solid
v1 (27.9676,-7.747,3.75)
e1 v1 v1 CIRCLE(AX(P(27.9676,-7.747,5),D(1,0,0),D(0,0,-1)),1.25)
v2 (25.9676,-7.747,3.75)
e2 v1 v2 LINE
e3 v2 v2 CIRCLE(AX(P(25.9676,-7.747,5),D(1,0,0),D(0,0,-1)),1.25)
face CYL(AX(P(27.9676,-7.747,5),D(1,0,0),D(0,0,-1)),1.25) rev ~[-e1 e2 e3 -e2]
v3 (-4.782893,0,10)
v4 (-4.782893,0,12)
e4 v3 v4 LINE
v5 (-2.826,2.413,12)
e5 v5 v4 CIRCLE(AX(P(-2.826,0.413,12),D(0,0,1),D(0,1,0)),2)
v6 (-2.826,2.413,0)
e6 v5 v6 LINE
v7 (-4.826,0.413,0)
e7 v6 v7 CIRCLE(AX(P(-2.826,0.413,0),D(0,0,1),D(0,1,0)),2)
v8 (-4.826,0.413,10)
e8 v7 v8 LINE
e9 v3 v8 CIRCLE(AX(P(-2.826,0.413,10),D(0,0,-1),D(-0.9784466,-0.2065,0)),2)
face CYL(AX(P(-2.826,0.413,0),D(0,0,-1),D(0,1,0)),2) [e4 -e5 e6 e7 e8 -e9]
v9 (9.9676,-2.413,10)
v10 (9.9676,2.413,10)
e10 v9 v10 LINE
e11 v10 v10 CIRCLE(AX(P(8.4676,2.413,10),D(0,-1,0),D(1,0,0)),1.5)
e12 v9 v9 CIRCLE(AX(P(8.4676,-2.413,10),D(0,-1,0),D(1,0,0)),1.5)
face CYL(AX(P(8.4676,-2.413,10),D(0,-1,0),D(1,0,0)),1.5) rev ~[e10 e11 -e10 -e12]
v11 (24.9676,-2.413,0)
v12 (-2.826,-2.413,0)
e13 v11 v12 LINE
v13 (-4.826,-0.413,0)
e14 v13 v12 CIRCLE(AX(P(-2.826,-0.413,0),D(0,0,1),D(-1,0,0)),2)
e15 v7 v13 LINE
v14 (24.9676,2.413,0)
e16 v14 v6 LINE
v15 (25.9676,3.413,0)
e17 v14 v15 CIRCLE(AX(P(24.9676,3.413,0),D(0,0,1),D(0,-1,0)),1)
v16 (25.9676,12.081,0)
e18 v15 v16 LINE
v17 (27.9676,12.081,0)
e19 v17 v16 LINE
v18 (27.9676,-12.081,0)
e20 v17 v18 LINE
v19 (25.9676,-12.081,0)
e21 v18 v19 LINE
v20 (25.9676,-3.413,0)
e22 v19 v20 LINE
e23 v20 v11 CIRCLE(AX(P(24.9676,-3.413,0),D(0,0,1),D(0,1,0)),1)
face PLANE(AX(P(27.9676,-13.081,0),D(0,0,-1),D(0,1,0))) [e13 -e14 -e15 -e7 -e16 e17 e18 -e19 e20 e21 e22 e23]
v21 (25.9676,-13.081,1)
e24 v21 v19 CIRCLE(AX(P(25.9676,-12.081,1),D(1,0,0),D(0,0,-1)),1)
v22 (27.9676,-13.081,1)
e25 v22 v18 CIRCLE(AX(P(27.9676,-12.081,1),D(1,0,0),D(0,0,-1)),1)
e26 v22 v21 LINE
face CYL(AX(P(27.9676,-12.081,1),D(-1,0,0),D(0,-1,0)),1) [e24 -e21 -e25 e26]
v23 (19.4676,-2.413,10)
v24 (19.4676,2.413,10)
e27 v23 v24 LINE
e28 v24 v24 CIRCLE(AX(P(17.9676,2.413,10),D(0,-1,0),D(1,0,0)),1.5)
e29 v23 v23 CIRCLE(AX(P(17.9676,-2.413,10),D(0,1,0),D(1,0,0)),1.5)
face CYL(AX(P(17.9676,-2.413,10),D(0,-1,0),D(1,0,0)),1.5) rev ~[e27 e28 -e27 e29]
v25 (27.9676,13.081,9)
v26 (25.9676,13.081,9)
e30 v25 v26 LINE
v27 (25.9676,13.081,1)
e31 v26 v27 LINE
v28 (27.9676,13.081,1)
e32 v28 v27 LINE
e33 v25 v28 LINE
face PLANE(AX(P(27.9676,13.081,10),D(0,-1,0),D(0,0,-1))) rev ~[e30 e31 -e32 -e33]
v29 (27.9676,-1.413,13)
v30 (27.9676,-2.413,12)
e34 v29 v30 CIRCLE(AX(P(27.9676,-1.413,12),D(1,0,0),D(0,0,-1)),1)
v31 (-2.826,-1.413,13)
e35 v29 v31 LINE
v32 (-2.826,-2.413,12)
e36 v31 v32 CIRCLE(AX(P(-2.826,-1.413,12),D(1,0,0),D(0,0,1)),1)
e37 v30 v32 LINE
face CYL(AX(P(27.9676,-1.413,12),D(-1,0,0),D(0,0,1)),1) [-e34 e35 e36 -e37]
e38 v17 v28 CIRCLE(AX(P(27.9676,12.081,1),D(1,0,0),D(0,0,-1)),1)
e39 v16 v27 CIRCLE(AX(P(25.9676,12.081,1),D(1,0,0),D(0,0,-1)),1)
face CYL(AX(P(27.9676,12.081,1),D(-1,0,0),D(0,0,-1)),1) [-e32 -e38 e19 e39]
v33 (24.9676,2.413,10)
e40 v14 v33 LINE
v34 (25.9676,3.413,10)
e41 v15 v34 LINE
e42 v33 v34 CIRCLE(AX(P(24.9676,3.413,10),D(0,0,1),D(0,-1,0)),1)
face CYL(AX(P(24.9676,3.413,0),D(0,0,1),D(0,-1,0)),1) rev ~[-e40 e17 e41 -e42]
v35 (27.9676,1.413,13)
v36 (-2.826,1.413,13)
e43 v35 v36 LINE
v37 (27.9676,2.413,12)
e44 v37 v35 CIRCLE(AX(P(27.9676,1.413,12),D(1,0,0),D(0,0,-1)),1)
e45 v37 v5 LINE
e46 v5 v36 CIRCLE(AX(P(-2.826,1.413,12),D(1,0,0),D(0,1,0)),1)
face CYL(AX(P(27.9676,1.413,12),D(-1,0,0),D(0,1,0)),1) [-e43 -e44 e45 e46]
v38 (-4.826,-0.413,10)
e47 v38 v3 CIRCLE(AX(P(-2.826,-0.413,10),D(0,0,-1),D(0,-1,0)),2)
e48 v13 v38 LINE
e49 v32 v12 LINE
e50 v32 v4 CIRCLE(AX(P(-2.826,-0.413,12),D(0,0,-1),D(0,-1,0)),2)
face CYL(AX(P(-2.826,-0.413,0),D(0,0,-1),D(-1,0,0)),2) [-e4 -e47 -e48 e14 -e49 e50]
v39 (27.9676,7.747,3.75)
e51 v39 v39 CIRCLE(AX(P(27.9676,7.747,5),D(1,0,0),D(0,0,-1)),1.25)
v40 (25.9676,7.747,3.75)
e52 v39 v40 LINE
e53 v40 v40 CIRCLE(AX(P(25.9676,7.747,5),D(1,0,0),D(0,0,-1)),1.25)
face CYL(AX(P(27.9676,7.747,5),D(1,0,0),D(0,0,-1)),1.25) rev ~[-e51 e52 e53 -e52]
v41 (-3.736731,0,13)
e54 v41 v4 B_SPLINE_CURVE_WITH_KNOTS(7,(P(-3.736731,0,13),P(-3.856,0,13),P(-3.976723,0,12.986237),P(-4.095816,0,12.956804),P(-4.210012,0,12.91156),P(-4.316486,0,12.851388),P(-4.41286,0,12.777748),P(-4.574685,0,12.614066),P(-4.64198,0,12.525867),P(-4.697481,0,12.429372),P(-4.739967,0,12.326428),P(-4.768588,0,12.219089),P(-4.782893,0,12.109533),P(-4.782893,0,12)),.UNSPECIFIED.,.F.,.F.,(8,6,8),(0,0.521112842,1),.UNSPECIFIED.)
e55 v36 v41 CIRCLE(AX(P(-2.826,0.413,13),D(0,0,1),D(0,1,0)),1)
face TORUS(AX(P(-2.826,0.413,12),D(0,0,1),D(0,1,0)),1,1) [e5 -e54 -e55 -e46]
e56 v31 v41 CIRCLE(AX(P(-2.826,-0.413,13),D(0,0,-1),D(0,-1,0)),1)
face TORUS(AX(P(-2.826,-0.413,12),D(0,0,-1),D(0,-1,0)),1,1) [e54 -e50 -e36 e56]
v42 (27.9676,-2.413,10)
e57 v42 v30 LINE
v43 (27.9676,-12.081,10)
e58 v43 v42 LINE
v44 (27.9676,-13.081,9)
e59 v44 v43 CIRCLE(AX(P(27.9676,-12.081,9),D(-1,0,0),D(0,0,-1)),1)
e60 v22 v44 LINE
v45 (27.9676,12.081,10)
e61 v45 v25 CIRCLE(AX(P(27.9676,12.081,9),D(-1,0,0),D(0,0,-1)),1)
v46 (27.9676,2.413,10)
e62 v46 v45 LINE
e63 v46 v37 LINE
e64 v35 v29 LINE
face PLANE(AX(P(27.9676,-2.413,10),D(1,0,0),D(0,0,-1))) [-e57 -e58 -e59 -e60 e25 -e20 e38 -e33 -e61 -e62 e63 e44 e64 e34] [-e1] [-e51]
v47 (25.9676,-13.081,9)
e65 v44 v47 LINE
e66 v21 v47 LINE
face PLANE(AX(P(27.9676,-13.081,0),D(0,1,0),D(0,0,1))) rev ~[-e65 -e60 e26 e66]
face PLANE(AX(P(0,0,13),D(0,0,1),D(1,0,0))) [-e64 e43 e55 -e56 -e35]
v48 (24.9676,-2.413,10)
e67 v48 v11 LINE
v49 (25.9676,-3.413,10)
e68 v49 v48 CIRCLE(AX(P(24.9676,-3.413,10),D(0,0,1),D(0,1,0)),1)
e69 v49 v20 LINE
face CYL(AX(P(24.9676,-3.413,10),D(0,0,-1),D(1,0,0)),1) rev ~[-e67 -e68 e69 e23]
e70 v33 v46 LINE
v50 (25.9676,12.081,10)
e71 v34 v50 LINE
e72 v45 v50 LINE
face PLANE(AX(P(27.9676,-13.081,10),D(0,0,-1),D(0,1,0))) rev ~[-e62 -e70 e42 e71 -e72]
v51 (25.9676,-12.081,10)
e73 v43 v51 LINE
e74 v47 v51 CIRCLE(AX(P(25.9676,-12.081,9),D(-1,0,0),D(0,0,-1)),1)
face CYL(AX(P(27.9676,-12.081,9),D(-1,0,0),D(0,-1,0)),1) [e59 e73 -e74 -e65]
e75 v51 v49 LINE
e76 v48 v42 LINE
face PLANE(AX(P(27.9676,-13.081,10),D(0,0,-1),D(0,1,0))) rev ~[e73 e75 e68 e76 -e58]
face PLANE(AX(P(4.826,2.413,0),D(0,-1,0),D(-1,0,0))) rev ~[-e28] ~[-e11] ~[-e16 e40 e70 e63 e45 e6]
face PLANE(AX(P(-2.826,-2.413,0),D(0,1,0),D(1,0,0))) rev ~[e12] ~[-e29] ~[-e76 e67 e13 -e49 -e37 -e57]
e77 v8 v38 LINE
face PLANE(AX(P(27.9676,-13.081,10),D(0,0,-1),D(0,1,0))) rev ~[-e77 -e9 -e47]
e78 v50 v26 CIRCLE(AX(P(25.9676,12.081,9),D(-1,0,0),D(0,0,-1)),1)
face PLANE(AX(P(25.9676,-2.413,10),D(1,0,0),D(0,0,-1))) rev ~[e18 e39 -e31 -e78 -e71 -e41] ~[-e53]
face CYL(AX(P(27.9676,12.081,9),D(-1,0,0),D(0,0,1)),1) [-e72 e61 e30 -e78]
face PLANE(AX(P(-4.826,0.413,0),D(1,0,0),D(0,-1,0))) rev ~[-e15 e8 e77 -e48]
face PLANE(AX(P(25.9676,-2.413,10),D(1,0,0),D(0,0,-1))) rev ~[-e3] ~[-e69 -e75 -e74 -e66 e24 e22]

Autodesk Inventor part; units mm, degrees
ref_plane "YZ Plane" through (0, 0, 0) normal (1, 0, 0) x (0, 1, 0)
ref_plane "XZ Plane" through (0, 0, 0) normal (0, 1, 0) x (-1, 0, 0)
sketch "Sketch1" plane through (0, 0, 0) normal (0, 0, 1) x (1, 0, 0)
  line L0 (-4.826, 0.413) -> (-4.826, -0.413) projected
  line L1 (-2.826, -2.413) -> (4.826, -2.413) projected
  line L2 (4.826, -2.413) -> (4.826, 2.413) projected
  line L3 (4.826, 2.413) -> (-2.826, 2.413) projected
  arc A0 (-4.826, -0.413) -> (-2.826, -2.413) centre (-2.826, -0.413) ccw projected
  arc A1 (-2.826, 2.413) -> (-4.826, 0.413) centre (-2.826, 0.413) ccw projected
  point P0 (0, 0)
extrude "Extrusion1" add sketch "Sketch1" along normal blind 10
sketch "Sketch2" plane through (4.826, -2.413, 0) normal (1, 0, 0) x (0, 0, -1)
  line L0 (0, 0) -> (-10, 0) projected
  line L1 (-10, 0) -> (-10, 4.826) projected
  circle A0 centre (3.175, 150.3292) radius 1.5 projected
  circle A1 centre (3.175, 23.749) radius 1.5 projected
  circle A2 centre (73.025, 23.749) radius 1.5 projected
  circle A3 centre (73.025, 150.3292) radius 1.5 projected
  arc A4 (60.2046, 236.2874) -> (0.9041, 211.5001) centre (77.9391, 110.5317) ccw projected
  ellipse E0 centre (170.686, 87.0391) end of major axis (408.43, 87.0391) minor radius 177.8 (0.9041, 211.5001) -> (0.9041, -37.4219) ccw projected
  arc A5 (0.9041, -37.4219) -> (60.2046, -62.2092) centre (77.9391, 63.5465) ccw projected
  arc A6 (60.2046, -62.2092) -> (281.1673, -62.2092) centre (170.686, 721.2179) ccw projected
  arc A7 (281.1673, -62.2092) -> (340.4678, -37.4219) centre (263.4329, 63.5465) ccw projected
  ellipse E1 centre (170.686, 87.0391) end of major axis (408.43, 87.0391) minor radius 177.8 (340.4678, -37.4219) -> (340.4678, 211.5001) ccw projected
  arc A8 (340.4678, 211.5001) -> (281.1673, 236.2874) centre (263.4329, 110.5317) ccw projected
  arc A9 (281.1673, 236.2874) -> (60.2046, 236.2874) centre (170.686, -547.1397) ccw projected
  circle A10 centre (18.1159, 118.5546) radius 1.25 projected
  circle A11 centre (-51.7341, 53.7756) radius 1.25 projected
  circle A12 centre (18.1159, 53.7756) radius 1.25 projected
  circle A13 centre (-51.7341, 118.5546) radius 1.25 projected
  circle A14 centre (395.605, 77.7641) radius 1.25 projected
  circle A15 centre (321.1037, 62.7821) radius 1.25 projected
  circle A16 centre (321.1037, 101.1361) radius 1.25 projected
  circle A17 centre (395.605, 96.3141) radius 1.25 projected
  line L2 (284.5488, 72.0792) -> (223.628, 72.0792) projected
  line L3 (223.628, 72.0792) -> (223.628, 102.5592) projected
  line L4 (223.628, 102.5592) -> (284.5488, 102.5592) projected
  line L5 (284.5488, 102.5592) -> (284.5488, 72.0792) projected
  circle A18 centre (129.4087, 87.0391) radius 30.4 projected
  line L6 (95.6616, 45.3432) -> (95.6616, 49.3432) projected
  arc A19 (98.6614, 49.3432) -> (95.6616, 49.3432) centre (97.1615, 49.3432) ccw projected
  line L7 (98.6614, 49.3432) -> (98.6614, 45.3432) projected
  arc A20 (95.6616, 45.3432) -> (98.6614, 45.3432) centre (97.1615, 45.3432) ccw projected
  line L8 (160.3503, 45.3892) -> (160.3503, 49.3892) projected
  arc A21 (163.3501, 49.3892) -> (160.3503, 49.3892) centre (161.8502, 49.3892) ccw projected
  line L9 (163.3501, 49.3892) -> (163.3501, 45.3892) projected
  arc A22 (160.3503, 45.3892) -> (163.3501, 45.3892) centre (161.8502, 45.3892) ccw projected
  line L10 (95.5803, 159.8921) -> (95.5803, 163.8921) projected
  arc A23 (98.5801, 163.8921) -> (95.5803, 163.8921) centre (97.0802, 163.8921) ccw projected
  line L11 (98.5801, 163.8921) -> (98.5801, 159.8921) projected
  arc A24 (95.5803, 159.8921) -> (98.5801, 159.8921) centre (97.0802, 159.8921) ccw projected
  line L12 (163.3504, 163.8921) -> (163.3504, 159.8921) projected
  arc A25 (160.3506, 159.8921) -> (163.3504, 159.8921) centre (161.8505, 159.8921) ccw projected
  line L13 (160.3506, 159.8921) -> (160.3506, 163.8921) projected
  arc A26 (163.3504, 163.8921) -> (160.3506, 163.8921) centre (161.8505, 163.8921) ccw projected
  arc A27 (180.3755, 134.9774) -> (180.3753, 131.9798) centre (180.3755, 133.4786) ccw projected
  line L14 (180.3755, 134.9774) -> (184.3754, 134.9776) projected
  arc A28 (184.3754, 131.9796) -> (184.3754, 134.9776) centre (184.3755, 133.4786) ccw projected
  line L15 (184.3754, 131.9796) -> (180.3753, 131.9798) projected
  arc A29 (65.9852, 134.9725) -> (65.9851, 131.9749) centre (65.9852, 133.4737) ccw projected
  line L16 (65.9852, 134.9725) -> (69.9852, 134.9727) projected
  arc A30 (69.9852, 131.9747) -> (69.9852, 134.9727) centre (69.9852, 133.4737) ccw projected
  line L17 (69.9852, 131.9747) -> (65.9851, 131.9749) projected
  arc A31 (188.0254, 134.9778) -> (188.0255, 131.9802) centre (188.0255, 133.479) ccw projected
  line L18 (188.0254, 134.9778) -> (192.0254, 134.978) projected
  arc A32 (192.0254, 131.98) -> (192.0254, 134.978) centre (192.0255, 133.479) ccw projected
  line L19 (192.0254, 131.98) -> (188.0255, 131.9802) projected
  arc A33 (73.6382, 70.1265) -> (73.6381, 67.1289) centre (73.6382, 68.6277) ccw projected
  line L20 (73.6382, 70.1265) -> (77.6381, 70.1267) projected
  arc A34 (77.6381, 67.1287) -> (77.6381, 70.1267) centre (77.6382, 68.6277) ccw projected
  line L21 (77.6381, 67.1287) -> (73.6381, 67.1289) projected
  circle A35 centre (271.4412, 59.8872) radius 1.25 projected
  circle A36 centre (229.978, 118.4342) radius 1.25 projected
  circle A37 centre (281.3738, 108.9092) radius 1.25 projected
  circle A38 centre (278.1988, 118.4342) radius 1.25 projected
  circle A39 centre (254.0826, 118.4342) radius 1.25 projected
  circle A40 centre (226.803, 108.9092) radius 1.25 projected
  circle A41 centre (226.5872, 59.8872) radius 1.25 projected
  arc A42 (188.0714, 70.2078) -> (188.0714, 67.2102) centre (188.0714, 68.709) ccw projected
  line L22 (188.0714, 70.2078) -> (192.0714, 70.208) projected
  arc A43 (192.0714, 67.21) -> (192.0714, 70.208) centre (192.0714, 68.709) ccw projected
  line L23 (192.0714, 67.21) -> (188.0714, 67.2102) projected
  line L24 (73.6352, 134.9725) -> (77.6351, 134.9727) projected
  arc A44 (77.6351, 131.9747) -> (77.6351, 134.9727) centre (77.6352, 133.4737) ccw projected
  line L25 (77.6351, 131.9747) -> (73.6351, 131.9749) projected
  arc A45 (73.6352, 134.9725) -> (73.6351, 131.9749) centre (73.6352, 133.4737) ccw projected
  arc A46 (66.0312, 70.1211) -> (66.0311, 67.1235) centre (66.0312, 68.6223) ccw projected
  line L26 (66.0312, 70.1211) -> (70.0312, 70.1213) projected
  arc A47 (70.0312, 67.1233) -> (70.0312, 70.1213) centre (70.0312, 68.6223) ccw projected
  line L27 (70.0312, 67.1233) -> (66.0311, 67.1235) projected
  arc A48 (180.4215, 70.2024) -> (180.4213, 67.2048) centre (180.4215, 68.7036) ccw projected
  line L28 (180.4215, 70.2024) -> (184.4214, 70.2025) projected
  arc A49 (184.4214, 67.2046) -> (184.4214, 70.2025) centre (184.4215, 68.7036) ccw projected
  line L29 (184.4214, 67.2046) -> (180.4213, 67.2048) projected
  line L30 (160.3503, 152.2421) -> (160.3503, 156.2421) projected
  arc A50 (163.3501, 156.2421) -> (160.3503, 156.2421) centre (161.8502, 156.2421) ccw projected
  line L31 (163.3501, 156.2421) -> (163.3501, 152.2421) projected
  arc A51 (160.3503, 152.2421) -> (163.3501, 152.2421) centre (161.8502, 152.2421) ccw projected
  line L32 (95.5857, 152.1961) -> (95.5857, 156.1961) projected
  arc A52 (98.5855, 156.1961) -> (95.5857, 156.1961) centre (97.0856, 156.1961) ccw projected
  line L33 (98.5855, 156.1961) -> (98.5855, 152.1961) projected
  arc A53 (95.5857, 152.1961) -> (98.5855, 152.1961) centre (97.0856, 152.1961) ccw projected
  line L34 (160.3503, 37.7392) -> (160.3503, 41.7392) projected
  arc A54 (163.3501, 41.7392) -> (160.3503, 41.7392) centre (161.8502, 41.7392) ccw projected
  line L35 (163.3501, 41.7392) -> (163.3501, 37.7392) projected
  arc A55 (160.3503, 37.7392) -> (163.3501, 37.7392) centre (161.8502, 37.7392) ccw projected
  line L36 (95.667, 37.6932) -> (95.667, 41.6932) projected
  arc A56 (98.6669, 41.6932) -> (95.667, 41.6932) centre (97.167, 41.6932) ccw projected
  line L37 (98.6669, 41.6932) -> (98.6669, 37.6932) projected
  arc A57 (95.667, 37.6932) -> (98.6669, 37.6932) centre (97.167, 37.6932) ccw projected
  line L38 (0, 4.826) -> (-10, 4.826) projected
  line L39 (0, -10.668) -> (0, 15.494) projected
  circle A58 centre (-5, -5.334) radius 1.5 projected
  circle A59 centre (81.2, -5.334) radius 1.5 projected
  circle A60 centre (81.2, 10.16) radius 1.5 projected
  circle A61 centre (-5, 10.16) radius 1.5 projected
  circle A62 centre (-5, 163.9182) radius 1.5 projected
  circle A63 centre (81.2, 163.9182) radius 1.5 projected
  circle A64 centre (81.2, 179.4122) radius 1.5 projected
  circle A65 centre (-5, 179.4122) radius 1.5 projected
  circle A66 centre (73.025, 187.9212) radius 1.5 projected
  circle A67 centre (73.025, -13.843) radius 1.5 projected
  circle A68 centre (3.175, -13.843) radius 1.5 projected
  circle A69 centre (3.175, 187.9212) radius 1.5 projected
  circle A70 centre (268.3469, 187.9212) radius 1.5 projected
  circle A71 centre (260.1719, 179.4122) radius 1.5 projected
  circle A72 centre (346.3719, 10.16) radius 1.5 projected
  circle A73 centre (346.3719, -5.334) radius 1.5 projected
  circle A74 centre (346.3719, 179.4122) radius 1.5 projected
  circle A75 centre (338.1969, 150.3292) radius 1.5 projected
  circle A76 centre (260.1719, -5.334) radius 1.5 projected
  circle A77 centre (268.3469, 23.749) radius 1.5 projected
  circle A78 centre (268.3469, -13.843) radius 1.5 projected
  circle A79 centre (260.1719, 10.16) radius 1.5 projected
  circle A80 centre (268.3469, 150.3292) radius 1.5 projected
  circle A81 centre (338.1969, -13.843) radius 1.5 projected
  circle A82 centre (338.1969, 23.749) radius 1.5 projected
  circle A83 centre (260.1719, 163.9182) radius 1.5 projected
  circle A84 centre (338.1969, 187.9212) radius 1.5 projected
  circle A85 centre (346.3719, 163.9182) radius 1.25 projected
  point P0 (0, 2.413)
ref_plane "Work Plane1" through (27.9676, -72.374, -408.43) normal (-1, 0, 0) x (0, 0, 1)
extrude "Extrusion2" add sketch "Sketch2" along normal up to surface (23.1416 mm away) contours L0 L1 L38 L39
sketch "Sketch3" plane through (27.9676, -2.413, 10) normal (1, 0, 0) x (0, 0, -1)
  line L0 (10, -10.668) -> (10, 15.494) projected
  line L1 (10, -10.668) -> (0, -10.668)
  line L2 (0, -10.668) -> (0, 15.494)
  line L3 (0, 15.494) -> (10, 15.494)
  line L4 (10, 15.494) -> (10, -10.668)
  line L5 (10, 2.826) -> (10, 2) projected
  line L6 (10, 0) -> (10, -10.668)
  line L7 (10, 4.826) -> (10, 15.494)
  circle A0 centre (5, -5.334) radius 1.25
  circle A1 centre (5, 10.16) radius 1.25
  point P0 (10, 2.413)
  point P1 (5, -10.668)
  point P2 (5, 15.494)
  point P3 (10, -5.334)
  point P4 (10, 10.16)
  dimension "d4" = 2.5
  dimension "d5" = 2.5
extrude "Extrusion3" add sketch "Sketch3" against normal blind 2
fillet "Fillet1" radius 1 6 edges at (25.9676, -2.413, 5) (25.9676, 2.413, 5) (26.9676, 13.081, 0) (26.9676, 13.081, 10) (26.9676, -13.081, 10) (26.9676, -13.081, 0)
sketch "Sketch4" plane through (0, 0, 10) normal (0, 0, 1) x (1, 0, 0)
  point P0 (0, 0)
sketch "Sketch5" plane through (0, 0, 10) normal (0, 0, 1) x (1, 0, 0)
  line L0 (27.9676, -12.081) -> (25.9676, -12.081) projected
  line L1 (27.9676, 12.081) -> (27.9676, -12.081) projected
  line L2 (25.9676, 12.081) -> (27.9676, 12.081) projected
  line L3 (25.9676, 3.413) -> (25.9676, 12.081) projected
  arc A0 (24.9676, 2.413) -> (25.9676, 3.413) centre (24.9676, 3.413) ccw projected
  line L4 (-2.826, 2.413) -> (24.9676, 2.413) projected
  arc A1 (-2.826, 2.413) -> (-4.826, 0.413) centre (-2.826, 0.413) ccw projected
  line L5 (-4.826, 0.413) -> (-4.826, -0.413) projected
  arc A2 (-4.826, -0.413) -> (-2.826, -2.413) centre (-2.826, -0.413) ccw projected
  line L6 (-2.826, -2.413) -> (24.9676, -2.413) projected
  arc A3 (25.9676, -3.413) -> (24.9676, -2.413) centre (24.9676, -3.413) ccw projected
  line L7 (25.9676, -12.081) -> (25.9676, -3.413) projected
  line L8 (-2.826, 2.413) -> (24.9676, 2.413) projected
  line L9 (-2.826, 2.413) -> (27.9676, 2.413)
  line L10 (27.9676, 2.413) -> (27.9676, -2.413)
  line L11 (27.9676, -2.413) -> (-2.826, -2.413)
  line L12 (-2.826, -2.413) -> (-2.826, 2.413)
  circle A4 centre (-2.826, 0.413) radius 2
  circle A5 centre (-2.826, -0.413) radius 2
  line L13 (-4.826, 0.413) -> (-4.826, -0.413) projected
  line L14 (-4.826, -0.413) -> (-4.826, 0.413)
  arc A6 (-2.826, 2.413) -> (-4.826, 0.413) centre (-2.826, 0.413) ccw projected
  point P0 (0, 0)
extrude "Extrusion4" add sketch "Sketch5" along normal blind 3 contours L11 L6 A5 A4 L4 L9 L1 | A2 A5 A4 L12 | L12 A4 A5 | L12 A5 A4 A1 | A4 A5 L12 | A4 A5 L12 | L12 A5 A4
sketch "Sketch6" plane through (-2.826, -2.413, 0) normal (0, -1, 0) x (1, 0, 0)
  line L0 (30.7936, 13) -> (0, 13) projected
  line L1 (30.7936, 10) -> (30.7936, 13) projected
  line L2 (30.7936, 13) -> (30.7936, 10)
  line L3 (30.7936, 10) -> (20.7936, 10)
  circle A0 centre (20.7936, 10) radius 1.5
  line L4 (20.7936, 10) -> (11.2936, 10)
  circle A1 centre (11.2936, 10) radius 1.5
  point P0 (2.826, 0)
  dimension "d11" = 10
  dimension "d12" = 3
  dimension "d13" = 9.5
  dimension "d14" = 3
extrude "Extrusion5" cut sketch "Sketch6" against normal blind 100
fillet "Fillet2" radius 1 4 edges at (12.5708, -2.413, 13) (-4.3794, -1.6728, 13) (12.5708, 2.413, 13) (-4.3794, 1.6728, 13)
properties part number "GuideArmConnector"
